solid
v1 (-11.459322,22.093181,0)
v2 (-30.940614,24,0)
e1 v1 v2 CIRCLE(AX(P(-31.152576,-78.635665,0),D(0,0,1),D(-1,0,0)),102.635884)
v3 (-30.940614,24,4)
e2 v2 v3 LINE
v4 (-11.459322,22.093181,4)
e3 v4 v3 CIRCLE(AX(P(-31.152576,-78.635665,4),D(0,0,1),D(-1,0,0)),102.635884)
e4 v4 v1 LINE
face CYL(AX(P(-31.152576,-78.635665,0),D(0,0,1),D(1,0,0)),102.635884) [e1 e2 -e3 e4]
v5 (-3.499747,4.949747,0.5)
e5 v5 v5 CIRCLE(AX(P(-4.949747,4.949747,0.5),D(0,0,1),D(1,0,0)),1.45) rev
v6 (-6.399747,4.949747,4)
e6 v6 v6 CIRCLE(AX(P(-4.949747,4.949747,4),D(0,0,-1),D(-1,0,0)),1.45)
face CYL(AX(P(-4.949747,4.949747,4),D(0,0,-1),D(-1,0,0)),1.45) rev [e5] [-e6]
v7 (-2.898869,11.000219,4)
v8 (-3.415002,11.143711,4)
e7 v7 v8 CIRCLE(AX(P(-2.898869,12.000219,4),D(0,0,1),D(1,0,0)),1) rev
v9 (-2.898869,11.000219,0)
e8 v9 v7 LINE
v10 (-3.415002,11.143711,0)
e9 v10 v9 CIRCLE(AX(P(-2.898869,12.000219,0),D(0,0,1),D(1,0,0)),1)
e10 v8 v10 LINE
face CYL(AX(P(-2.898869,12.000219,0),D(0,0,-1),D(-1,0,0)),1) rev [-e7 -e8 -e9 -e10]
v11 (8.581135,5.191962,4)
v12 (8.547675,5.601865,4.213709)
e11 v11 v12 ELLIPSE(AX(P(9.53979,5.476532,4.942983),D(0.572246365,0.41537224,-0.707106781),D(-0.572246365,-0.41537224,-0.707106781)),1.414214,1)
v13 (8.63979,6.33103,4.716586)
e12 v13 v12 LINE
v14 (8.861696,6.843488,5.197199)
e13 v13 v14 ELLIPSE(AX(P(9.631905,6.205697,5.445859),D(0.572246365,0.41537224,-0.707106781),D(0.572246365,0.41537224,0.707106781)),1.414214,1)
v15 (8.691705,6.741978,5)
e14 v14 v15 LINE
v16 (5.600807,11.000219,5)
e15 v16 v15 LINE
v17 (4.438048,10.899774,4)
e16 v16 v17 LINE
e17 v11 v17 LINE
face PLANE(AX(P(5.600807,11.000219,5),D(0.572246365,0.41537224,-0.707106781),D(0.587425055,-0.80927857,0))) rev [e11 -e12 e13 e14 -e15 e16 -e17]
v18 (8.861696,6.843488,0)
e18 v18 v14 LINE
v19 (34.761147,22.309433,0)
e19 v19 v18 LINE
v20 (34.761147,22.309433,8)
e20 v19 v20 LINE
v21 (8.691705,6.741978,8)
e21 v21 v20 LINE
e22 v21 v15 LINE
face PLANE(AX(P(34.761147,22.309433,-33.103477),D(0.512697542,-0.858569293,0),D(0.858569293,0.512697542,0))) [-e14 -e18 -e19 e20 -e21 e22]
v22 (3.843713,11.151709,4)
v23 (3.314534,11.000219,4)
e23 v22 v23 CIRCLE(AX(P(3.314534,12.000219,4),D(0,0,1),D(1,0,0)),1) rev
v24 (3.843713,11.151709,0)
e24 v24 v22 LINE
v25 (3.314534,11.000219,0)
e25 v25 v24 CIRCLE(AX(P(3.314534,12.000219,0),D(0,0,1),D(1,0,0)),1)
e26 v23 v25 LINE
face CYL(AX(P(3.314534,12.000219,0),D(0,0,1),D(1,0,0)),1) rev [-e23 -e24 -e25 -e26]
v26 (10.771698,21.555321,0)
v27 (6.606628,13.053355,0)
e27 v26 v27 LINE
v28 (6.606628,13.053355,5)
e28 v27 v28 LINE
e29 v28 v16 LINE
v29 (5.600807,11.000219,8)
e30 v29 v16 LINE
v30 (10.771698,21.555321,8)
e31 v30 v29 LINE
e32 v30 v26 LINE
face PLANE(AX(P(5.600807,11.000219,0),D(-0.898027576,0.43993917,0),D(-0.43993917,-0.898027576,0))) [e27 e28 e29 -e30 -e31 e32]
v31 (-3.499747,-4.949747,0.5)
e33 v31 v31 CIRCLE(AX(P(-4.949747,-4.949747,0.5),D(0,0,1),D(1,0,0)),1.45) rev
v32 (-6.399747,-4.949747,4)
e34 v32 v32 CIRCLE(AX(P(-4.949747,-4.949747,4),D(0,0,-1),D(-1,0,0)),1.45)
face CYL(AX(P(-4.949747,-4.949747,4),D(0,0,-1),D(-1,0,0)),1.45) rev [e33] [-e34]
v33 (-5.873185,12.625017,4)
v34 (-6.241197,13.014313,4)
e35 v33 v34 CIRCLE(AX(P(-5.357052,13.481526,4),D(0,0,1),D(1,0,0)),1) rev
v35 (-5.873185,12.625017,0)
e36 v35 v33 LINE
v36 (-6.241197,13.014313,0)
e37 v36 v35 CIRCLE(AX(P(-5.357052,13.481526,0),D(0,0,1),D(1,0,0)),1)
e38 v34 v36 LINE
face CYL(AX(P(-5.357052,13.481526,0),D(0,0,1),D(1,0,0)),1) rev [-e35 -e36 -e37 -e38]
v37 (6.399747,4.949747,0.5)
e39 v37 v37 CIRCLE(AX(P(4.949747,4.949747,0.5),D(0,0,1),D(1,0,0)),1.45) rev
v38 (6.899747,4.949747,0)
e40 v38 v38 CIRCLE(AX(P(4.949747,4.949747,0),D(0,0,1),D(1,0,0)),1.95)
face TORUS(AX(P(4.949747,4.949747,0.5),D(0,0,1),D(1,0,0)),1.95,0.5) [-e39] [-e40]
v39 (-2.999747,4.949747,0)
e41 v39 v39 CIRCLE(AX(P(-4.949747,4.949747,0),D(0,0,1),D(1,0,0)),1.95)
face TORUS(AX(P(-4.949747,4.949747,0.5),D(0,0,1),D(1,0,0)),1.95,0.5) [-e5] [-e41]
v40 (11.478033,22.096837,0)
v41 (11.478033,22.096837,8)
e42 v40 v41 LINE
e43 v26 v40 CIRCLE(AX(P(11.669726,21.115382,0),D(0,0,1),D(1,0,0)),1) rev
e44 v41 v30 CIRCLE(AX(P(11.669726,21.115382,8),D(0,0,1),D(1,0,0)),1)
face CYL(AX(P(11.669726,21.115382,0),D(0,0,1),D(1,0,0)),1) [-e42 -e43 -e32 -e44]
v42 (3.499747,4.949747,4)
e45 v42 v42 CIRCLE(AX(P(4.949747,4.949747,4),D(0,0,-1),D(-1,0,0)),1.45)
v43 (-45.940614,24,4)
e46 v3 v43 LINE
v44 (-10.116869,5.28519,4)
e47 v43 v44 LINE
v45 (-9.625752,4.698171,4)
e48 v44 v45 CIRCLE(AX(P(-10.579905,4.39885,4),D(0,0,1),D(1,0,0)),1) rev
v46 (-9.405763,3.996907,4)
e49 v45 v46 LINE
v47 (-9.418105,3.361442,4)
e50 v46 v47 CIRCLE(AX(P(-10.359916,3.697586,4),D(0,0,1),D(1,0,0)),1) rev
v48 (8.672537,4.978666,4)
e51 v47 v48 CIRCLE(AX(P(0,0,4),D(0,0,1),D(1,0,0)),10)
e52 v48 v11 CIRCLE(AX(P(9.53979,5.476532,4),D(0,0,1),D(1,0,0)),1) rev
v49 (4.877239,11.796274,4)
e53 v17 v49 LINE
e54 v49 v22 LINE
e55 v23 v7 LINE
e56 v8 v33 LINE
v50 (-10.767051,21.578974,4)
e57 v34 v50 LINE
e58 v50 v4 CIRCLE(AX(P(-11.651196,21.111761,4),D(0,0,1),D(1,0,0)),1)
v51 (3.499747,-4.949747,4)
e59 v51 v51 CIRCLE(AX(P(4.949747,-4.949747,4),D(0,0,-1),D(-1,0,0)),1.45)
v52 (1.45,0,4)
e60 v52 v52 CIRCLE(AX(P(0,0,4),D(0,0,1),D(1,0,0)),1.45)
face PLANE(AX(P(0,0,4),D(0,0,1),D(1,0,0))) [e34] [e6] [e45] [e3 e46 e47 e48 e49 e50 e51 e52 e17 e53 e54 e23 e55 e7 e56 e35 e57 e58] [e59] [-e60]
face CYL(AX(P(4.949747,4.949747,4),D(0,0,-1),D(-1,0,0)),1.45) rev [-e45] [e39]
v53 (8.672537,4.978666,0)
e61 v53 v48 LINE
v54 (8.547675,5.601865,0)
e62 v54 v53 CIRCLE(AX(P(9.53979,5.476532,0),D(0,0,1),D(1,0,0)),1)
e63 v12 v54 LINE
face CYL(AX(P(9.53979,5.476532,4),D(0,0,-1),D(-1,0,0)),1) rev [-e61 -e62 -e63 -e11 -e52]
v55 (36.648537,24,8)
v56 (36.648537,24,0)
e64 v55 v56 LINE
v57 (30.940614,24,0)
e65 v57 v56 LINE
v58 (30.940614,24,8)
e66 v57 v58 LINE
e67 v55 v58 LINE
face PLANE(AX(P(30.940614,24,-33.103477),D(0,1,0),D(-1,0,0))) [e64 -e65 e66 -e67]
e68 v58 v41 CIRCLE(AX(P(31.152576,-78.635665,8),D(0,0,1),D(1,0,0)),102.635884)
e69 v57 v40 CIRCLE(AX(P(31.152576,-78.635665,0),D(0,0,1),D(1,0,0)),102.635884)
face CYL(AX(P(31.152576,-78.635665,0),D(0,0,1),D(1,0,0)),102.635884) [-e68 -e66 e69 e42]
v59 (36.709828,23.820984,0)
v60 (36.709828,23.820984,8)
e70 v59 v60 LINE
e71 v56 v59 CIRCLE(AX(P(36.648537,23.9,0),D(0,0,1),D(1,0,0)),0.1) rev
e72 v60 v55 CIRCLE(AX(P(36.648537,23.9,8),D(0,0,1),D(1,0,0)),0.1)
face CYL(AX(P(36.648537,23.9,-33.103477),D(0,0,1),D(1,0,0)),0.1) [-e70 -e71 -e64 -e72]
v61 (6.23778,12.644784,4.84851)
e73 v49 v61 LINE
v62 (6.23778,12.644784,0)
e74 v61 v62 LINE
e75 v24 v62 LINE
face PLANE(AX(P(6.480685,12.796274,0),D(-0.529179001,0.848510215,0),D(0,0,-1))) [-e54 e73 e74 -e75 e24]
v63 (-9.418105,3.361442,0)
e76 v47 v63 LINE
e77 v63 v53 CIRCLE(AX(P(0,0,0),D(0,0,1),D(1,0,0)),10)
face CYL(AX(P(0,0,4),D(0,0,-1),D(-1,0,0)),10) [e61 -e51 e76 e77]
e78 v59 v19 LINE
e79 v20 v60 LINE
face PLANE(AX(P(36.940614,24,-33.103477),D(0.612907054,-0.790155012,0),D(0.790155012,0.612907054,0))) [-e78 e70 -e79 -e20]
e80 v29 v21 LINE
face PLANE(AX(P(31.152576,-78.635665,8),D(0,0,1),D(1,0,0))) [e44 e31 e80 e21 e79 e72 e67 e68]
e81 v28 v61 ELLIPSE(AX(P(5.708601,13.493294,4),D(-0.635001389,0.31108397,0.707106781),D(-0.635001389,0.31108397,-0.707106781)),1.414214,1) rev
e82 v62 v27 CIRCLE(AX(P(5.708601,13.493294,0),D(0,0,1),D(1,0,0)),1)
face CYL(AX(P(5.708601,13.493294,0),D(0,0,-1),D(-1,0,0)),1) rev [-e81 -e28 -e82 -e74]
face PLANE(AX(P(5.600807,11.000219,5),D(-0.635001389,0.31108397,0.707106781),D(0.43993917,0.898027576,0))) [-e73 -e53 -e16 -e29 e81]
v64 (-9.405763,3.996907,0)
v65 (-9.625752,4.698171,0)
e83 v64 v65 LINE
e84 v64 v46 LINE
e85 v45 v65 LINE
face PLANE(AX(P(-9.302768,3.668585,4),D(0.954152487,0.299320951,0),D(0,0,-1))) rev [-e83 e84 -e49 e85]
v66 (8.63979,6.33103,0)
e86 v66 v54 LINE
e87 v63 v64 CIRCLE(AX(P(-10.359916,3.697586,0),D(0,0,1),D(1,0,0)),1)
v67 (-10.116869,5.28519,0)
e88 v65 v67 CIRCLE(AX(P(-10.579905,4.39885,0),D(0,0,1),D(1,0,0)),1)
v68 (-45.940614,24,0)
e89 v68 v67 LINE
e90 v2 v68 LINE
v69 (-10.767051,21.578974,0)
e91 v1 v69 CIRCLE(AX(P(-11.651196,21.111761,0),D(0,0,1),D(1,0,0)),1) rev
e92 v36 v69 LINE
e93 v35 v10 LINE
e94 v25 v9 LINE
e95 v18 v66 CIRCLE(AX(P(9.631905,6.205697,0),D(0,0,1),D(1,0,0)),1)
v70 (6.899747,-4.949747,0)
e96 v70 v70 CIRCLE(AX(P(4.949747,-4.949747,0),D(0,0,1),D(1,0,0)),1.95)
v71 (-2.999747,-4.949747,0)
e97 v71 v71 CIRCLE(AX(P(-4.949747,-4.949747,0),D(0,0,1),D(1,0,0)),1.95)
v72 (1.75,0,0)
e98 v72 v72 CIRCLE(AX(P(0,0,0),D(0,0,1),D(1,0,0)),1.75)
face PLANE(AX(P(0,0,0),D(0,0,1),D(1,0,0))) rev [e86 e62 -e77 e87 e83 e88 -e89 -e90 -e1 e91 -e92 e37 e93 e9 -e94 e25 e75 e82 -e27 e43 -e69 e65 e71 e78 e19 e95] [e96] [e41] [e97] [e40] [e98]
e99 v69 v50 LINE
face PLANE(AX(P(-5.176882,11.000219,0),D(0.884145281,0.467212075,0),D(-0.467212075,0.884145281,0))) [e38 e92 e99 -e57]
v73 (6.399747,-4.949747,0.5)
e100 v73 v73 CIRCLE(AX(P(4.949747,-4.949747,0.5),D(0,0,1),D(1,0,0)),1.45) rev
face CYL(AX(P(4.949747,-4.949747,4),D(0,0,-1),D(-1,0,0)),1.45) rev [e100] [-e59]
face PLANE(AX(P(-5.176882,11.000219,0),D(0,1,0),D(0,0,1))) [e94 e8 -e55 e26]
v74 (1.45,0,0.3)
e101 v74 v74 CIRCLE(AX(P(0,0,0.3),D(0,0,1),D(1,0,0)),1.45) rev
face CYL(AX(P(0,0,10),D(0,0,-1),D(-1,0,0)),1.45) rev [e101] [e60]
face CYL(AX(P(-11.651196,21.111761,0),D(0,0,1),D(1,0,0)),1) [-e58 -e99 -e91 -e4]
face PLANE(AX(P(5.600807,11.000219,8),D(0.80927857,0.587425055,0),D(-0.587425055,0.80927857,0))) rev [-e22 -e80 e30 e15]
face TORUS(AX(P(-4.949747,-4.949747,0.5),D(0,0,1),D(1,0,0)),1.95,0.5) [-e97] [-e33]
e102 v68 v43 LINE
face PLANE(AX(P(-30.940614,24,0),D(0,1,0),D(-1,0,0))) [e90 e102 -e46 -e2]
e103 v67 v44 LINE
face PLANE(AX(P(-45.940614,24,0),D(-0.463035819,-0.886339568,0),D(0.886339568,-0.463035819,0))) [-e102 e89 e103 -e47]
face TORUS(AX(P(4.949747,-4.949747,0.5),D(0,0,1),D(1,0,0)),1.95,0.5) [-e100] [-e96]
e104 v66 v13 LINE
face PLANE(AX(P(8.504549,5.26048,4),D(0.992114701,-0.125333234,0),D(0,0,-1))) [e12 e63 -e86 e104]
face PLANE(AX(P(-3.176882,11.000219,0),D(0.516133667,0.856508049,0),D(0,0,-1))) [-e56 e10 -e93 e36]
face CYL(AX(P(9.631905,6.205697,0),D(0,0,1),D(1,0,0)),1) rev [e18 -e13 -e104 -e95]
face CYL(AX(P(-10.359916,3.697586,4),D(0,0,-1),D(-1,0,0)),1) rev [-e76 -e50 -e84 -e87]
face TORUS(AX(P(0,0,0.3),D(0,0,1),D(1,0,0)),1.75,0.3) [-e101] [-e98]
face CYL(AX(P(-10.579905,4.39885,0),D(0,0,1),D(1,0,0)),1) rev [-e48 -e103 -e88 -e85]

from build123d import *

# Parameters (mm, degrees)
SKETCH_1_R          = 10
EXTRUDE_1_DEPTH     = 4
EXTRUDE_3_DEPTH     = 4
SKETCH_4_R          = 1.45
CUT_EXTRUDE_1_DEPTH = 4
FILLET_5_R          = 0.5
CHAMFER_4_SIZE      = 1
EXTRUDE_START       = 4
EXTRUDE_4_DEPTH     = 4
CHAMFER_5_SIZE      = 2
CHAMFER_6_SIZE      = 1
FILLET_7_R          = 1
FILLET_8_R          = 1
FILLET_9_R          = 1
SKETCH_6_R          = 1.45
CUT_EXTRUDE_2_DEPTH = 10
FILLET_10_R         = 0.3
EXTRUDE_5_REACH     = 54.446
FILLET_11_R         = 0.1


with BuildPart() as part:
    # 草图1 → 凸台-拉伸1 (new body)
    with BuildSketch(Plane.XY):
        Circle(SKETCH_1_R)
    extrude(amount=EXTRUDE_1_DEPTH)

    # 草图3 → 凸台-拉伸3 (add)
    with BuildSketch(Plane.XY.offset(4)):
        with BuildLine():
            Line((-5.176881784364506, 11.000218871775912), (5.600807006130042, 11.000218871775912))
            Line((5.600807006130042, 11.000218871775912), (10.989651401377268, 22.000218871775843))
            ThreePointArc((10.989651401377268, 22.000218871775843), (20.91618080670068, 23.488479392998585), (30.94061356284172, 23.999999999999996))
            Line((30.94061356284172, 23.999999999999996), (0, 0))
            Line((0, 0), (-45.940613562841676, 24.00000000000002))
            Line((-45.940613562841676, 24.00000000000002), (-30.940613562841733, 23.999999999999996))
            ThreePointArc((-30.940613562841733, 23.999999999999996), (-20.916180806700666, 23.488479392998585), (-10.989651401377253, 22.000218871775836))
            Line((-10.989651401377253, 22.000218871775836), (-5.176881784364506, 11.000218871775912))
        make_face()
    extrude(amount=-EXTRUDE_3_DEPTH)

    # 草图4 → 切除-拉伸1 (cut)
    with BuildSketch(Plane(origin=(0, 0, 0), x_dir=(-1, 0, 0), z_dir=(0, 0, -1))):
        with Locations((-4.949747468305833, -4.949747468305833)):
            Circle(SKETCH_4_R)
        with Locations((-4.949747468305833, 4.949747468305833)):
            Circle(SKETCH_4_R)
        with Locations((4.949747468305833, 4.949747468305833)):
            Circle(SKETCH_4_R)
        with Locations((4.949747468305833, -4.949747468305833)):
            Circle(SKETCH_4_R)
    extrude(amount=-CUT_EXTRUDE_1_DEPTH, mode=Mode.SUBTRACT)

    # 圆角5
    fillet_5_edges = [part.edges().sort_by_distance(p)[0] for p in [
        (-3.4997474683058325, -4.949747468305833, 0),
        (-3.4997474683058325, 4.949747468305833, 0),
        (6.399747468305833, 4.949747468305833, 0),
        (6.399747468305833, -4.949747468305833, 0),
    ]]
    fillet(fillet_5_edges, radius=FILLET_5_R)

    # 倒角4
    # the kernel refuses this chamfer: 1 mm, written as the material it adds along each edge
    with BuildSketch(Plane(origin=(-8.863395681809687, 4.630358192157212, 4), x_dir=(-0.4155282844183179, -0.9095802575080274, 0), z_dir=(0, 0, -1))) as chamfer_4_piece_1:
        with BuildLine():
            Line((1.0573815899873193, -3e-17), (-CHAMFER_4_SIZE * 0.0528690794994, CHAMFER_4_SIZE * 0.998601452249))
            Line((-CHAMFER_4_SIZE * 0.0528690794994, CHAMFER_4_SIZE * 0.998601452249), (0, 0))
            ThreePointArc((0, 0), (0.5436016135552321, 0.01397436088292918), (1.0573815899873193, -3e-17))
        make_face()
    extrude(amount=4)
    with BuildSketch(Plane(origin=(7.901550123756916, 6.129070536529751, 4), x_dir=(0.5702751057051193, -0.8214537746051297, 0), z_dir=(0, 0, -1))) as chamfer_4_piece_2:
        with BuildLine():
            Line((1.0573815899873211, -5e-17), (-CHAMFER_4_SIZE * 0.0528690794994, -CHAMFER_4_SIZE * 0.998601452249))
            Line((-CHAMFER_4_SIZE * 0.0528690794994, -CHAMFER_4_SIZE * 0.998601452249), (0, 0))
            ThreePointArc((0, 0), (0.5436016135552315, -0.01397436088292837), (1.0573815899873211, -5e-17))
        make_face()
    extrude(amount=4)

    # 草图5 → 凸台-拉伸4 (add)
    with BuildSketch(Plane.XY.offset(4).offset(EXTRUDE_START)):
        with BuildLine():
            Line((10.989651401377264, 22.00021887177582), (5.600807006130042, 11.000218871775912))
            Line((5.600807006130042, 11.000218871775912), (8.691705136132603, 6.741977590182721))
            Line((8.691705136132603, 6.741977590182721), (30.94061356284172, 23.999999999999996))
            ThreePointArc((30.94061356284172, 23.999999999999996), (20.91618080670068, 23.488479392998585), (10.989651401377264, 22.00021887177582))
        make_face()
    extrude(amount=-EXTRUDE_4_DEPTH)

    # 倒角5
    chamfer_5_edges = [part.edges().sort_by_distance(p)[0] for p in [
        (-5.176881784364506, 11.000218871775912, 2),
        (5.600807006130042, 11.000218871775912, 2),
    ]]
    chamfer(chamfer_5_edges, length=CHAMFER_5_SIZE)

    # 倒角6
    chamfer_6_edges = [part.edges().sort_by_distance(p)[0] for p in [
        (7.146256071131322, 8.871098230979317, 4),
        (6.040746175985957, 11.898246447536525, 4),
    ]]
    chamfer(chamfer_6_edges, length=CHAMFER_6_SIZE)

    # 圆角7
    fillet_7_edges = [part.edges().sort_by_distance(p)[0] for p in [
        (6.480685345841874, 12.796274023297144, 2.5),
        (-3.1768817843645056, 11.00021887177591, 2),
        (3.60080700613004, 11.000218871775912, 2),
        (-6.111305934127264, 12.768509432837678, 2),
    ]]
    fillet(fillet_7_edges, radius=FILLET_7_R)

    # 圆角8
    fillet_8_edges = [part.edges().sort_by_distance(p)[0] for p in [
        (-10.989651401377252, 22.000218871775846, 2),
        (10.989651401377264, 22.000218871775836, 4),
    ]]
    fillet(fillet_8_edges, radius=FILLET_8_R)

    # 圆角9
    fillet_9_edges = [part.edges().sort_by_distance(p)[0] for p in [
        (8.504548521757462, 5.26048043823719, 2),
        (8.691705136132835, 6.741977590182982, 2.5),
        (-9.302767639872544, 3.6685847732522547, 2),
        (-9.749735249991502, 5.093394011372698, 2),
    ]]
    fillet(fillet_9_edges, radius=FILLET_9_R)

    # 草图6 → 切除-拉伸2 (cut)
    with BuildSketch(Plane(origin=(0, 0, 0), x_dir=(-1, 0, 0), z_dir=(0, 0, -1))):
        Circle(SKETCH_6_R)
    extrude(amount=-CUT_EXTRUDE_2_DEPTH, mode=Mode.SUBTRACT)

    # 圆角10
    fillet_10_edges = [part.edges().sort_by_distance(p)[0] for p in [
        (1.45, 1.8e-16, 0),
    ]]
    fillet(fillet_10_edges, radius=FILLET_10_R)

    # 凸台-拉伸5: up to this face of the body (flat: up to its plane)
    extrude_5_end = Plane(part.part.faces().sort_by_distance((-5.497293507, 11.434254101, 0))[0])
    # 草图7 → 凸台-拉伸5 (add, up to the picked face)
    with BuildSketch(Plane.XY.offset(8), mode=Mode.PRIVATE) as extrude_5_sk1:
        Polygon((30.94061356284172, 23.999999999999996), (36.94061356284172, 23.999999999999993), (34.761147405505504, 22.309432756728267), (8.691705136132603, 6.741977590182721), (28.761147405505504, 22.30943275672827), align=None)
    extrude_5_tool1 = split(extrude(extrude_5_sk1.sketch, amount=-EXTRUDE_5_REACH, mode=Mode.PRIVATE), bisect_by=extrude_5_end, keep=Keep.BOTH, mode=Mode.PRIVATE)
    add(extrude_5_tool1.solids().sort_by(Axis((25.637932, 18.197049, 8), (0, 0, -1)))[0])

    # 圆角11
    fillet_11_edges = [part.edges().sort_by_distance(p)[0] for p in [
        (36.94061356284172, 23.999999999999993, 4),
    ]]
    fillet(fillet_11_edges, radius=FILLET_11_R)


solid = part.part
